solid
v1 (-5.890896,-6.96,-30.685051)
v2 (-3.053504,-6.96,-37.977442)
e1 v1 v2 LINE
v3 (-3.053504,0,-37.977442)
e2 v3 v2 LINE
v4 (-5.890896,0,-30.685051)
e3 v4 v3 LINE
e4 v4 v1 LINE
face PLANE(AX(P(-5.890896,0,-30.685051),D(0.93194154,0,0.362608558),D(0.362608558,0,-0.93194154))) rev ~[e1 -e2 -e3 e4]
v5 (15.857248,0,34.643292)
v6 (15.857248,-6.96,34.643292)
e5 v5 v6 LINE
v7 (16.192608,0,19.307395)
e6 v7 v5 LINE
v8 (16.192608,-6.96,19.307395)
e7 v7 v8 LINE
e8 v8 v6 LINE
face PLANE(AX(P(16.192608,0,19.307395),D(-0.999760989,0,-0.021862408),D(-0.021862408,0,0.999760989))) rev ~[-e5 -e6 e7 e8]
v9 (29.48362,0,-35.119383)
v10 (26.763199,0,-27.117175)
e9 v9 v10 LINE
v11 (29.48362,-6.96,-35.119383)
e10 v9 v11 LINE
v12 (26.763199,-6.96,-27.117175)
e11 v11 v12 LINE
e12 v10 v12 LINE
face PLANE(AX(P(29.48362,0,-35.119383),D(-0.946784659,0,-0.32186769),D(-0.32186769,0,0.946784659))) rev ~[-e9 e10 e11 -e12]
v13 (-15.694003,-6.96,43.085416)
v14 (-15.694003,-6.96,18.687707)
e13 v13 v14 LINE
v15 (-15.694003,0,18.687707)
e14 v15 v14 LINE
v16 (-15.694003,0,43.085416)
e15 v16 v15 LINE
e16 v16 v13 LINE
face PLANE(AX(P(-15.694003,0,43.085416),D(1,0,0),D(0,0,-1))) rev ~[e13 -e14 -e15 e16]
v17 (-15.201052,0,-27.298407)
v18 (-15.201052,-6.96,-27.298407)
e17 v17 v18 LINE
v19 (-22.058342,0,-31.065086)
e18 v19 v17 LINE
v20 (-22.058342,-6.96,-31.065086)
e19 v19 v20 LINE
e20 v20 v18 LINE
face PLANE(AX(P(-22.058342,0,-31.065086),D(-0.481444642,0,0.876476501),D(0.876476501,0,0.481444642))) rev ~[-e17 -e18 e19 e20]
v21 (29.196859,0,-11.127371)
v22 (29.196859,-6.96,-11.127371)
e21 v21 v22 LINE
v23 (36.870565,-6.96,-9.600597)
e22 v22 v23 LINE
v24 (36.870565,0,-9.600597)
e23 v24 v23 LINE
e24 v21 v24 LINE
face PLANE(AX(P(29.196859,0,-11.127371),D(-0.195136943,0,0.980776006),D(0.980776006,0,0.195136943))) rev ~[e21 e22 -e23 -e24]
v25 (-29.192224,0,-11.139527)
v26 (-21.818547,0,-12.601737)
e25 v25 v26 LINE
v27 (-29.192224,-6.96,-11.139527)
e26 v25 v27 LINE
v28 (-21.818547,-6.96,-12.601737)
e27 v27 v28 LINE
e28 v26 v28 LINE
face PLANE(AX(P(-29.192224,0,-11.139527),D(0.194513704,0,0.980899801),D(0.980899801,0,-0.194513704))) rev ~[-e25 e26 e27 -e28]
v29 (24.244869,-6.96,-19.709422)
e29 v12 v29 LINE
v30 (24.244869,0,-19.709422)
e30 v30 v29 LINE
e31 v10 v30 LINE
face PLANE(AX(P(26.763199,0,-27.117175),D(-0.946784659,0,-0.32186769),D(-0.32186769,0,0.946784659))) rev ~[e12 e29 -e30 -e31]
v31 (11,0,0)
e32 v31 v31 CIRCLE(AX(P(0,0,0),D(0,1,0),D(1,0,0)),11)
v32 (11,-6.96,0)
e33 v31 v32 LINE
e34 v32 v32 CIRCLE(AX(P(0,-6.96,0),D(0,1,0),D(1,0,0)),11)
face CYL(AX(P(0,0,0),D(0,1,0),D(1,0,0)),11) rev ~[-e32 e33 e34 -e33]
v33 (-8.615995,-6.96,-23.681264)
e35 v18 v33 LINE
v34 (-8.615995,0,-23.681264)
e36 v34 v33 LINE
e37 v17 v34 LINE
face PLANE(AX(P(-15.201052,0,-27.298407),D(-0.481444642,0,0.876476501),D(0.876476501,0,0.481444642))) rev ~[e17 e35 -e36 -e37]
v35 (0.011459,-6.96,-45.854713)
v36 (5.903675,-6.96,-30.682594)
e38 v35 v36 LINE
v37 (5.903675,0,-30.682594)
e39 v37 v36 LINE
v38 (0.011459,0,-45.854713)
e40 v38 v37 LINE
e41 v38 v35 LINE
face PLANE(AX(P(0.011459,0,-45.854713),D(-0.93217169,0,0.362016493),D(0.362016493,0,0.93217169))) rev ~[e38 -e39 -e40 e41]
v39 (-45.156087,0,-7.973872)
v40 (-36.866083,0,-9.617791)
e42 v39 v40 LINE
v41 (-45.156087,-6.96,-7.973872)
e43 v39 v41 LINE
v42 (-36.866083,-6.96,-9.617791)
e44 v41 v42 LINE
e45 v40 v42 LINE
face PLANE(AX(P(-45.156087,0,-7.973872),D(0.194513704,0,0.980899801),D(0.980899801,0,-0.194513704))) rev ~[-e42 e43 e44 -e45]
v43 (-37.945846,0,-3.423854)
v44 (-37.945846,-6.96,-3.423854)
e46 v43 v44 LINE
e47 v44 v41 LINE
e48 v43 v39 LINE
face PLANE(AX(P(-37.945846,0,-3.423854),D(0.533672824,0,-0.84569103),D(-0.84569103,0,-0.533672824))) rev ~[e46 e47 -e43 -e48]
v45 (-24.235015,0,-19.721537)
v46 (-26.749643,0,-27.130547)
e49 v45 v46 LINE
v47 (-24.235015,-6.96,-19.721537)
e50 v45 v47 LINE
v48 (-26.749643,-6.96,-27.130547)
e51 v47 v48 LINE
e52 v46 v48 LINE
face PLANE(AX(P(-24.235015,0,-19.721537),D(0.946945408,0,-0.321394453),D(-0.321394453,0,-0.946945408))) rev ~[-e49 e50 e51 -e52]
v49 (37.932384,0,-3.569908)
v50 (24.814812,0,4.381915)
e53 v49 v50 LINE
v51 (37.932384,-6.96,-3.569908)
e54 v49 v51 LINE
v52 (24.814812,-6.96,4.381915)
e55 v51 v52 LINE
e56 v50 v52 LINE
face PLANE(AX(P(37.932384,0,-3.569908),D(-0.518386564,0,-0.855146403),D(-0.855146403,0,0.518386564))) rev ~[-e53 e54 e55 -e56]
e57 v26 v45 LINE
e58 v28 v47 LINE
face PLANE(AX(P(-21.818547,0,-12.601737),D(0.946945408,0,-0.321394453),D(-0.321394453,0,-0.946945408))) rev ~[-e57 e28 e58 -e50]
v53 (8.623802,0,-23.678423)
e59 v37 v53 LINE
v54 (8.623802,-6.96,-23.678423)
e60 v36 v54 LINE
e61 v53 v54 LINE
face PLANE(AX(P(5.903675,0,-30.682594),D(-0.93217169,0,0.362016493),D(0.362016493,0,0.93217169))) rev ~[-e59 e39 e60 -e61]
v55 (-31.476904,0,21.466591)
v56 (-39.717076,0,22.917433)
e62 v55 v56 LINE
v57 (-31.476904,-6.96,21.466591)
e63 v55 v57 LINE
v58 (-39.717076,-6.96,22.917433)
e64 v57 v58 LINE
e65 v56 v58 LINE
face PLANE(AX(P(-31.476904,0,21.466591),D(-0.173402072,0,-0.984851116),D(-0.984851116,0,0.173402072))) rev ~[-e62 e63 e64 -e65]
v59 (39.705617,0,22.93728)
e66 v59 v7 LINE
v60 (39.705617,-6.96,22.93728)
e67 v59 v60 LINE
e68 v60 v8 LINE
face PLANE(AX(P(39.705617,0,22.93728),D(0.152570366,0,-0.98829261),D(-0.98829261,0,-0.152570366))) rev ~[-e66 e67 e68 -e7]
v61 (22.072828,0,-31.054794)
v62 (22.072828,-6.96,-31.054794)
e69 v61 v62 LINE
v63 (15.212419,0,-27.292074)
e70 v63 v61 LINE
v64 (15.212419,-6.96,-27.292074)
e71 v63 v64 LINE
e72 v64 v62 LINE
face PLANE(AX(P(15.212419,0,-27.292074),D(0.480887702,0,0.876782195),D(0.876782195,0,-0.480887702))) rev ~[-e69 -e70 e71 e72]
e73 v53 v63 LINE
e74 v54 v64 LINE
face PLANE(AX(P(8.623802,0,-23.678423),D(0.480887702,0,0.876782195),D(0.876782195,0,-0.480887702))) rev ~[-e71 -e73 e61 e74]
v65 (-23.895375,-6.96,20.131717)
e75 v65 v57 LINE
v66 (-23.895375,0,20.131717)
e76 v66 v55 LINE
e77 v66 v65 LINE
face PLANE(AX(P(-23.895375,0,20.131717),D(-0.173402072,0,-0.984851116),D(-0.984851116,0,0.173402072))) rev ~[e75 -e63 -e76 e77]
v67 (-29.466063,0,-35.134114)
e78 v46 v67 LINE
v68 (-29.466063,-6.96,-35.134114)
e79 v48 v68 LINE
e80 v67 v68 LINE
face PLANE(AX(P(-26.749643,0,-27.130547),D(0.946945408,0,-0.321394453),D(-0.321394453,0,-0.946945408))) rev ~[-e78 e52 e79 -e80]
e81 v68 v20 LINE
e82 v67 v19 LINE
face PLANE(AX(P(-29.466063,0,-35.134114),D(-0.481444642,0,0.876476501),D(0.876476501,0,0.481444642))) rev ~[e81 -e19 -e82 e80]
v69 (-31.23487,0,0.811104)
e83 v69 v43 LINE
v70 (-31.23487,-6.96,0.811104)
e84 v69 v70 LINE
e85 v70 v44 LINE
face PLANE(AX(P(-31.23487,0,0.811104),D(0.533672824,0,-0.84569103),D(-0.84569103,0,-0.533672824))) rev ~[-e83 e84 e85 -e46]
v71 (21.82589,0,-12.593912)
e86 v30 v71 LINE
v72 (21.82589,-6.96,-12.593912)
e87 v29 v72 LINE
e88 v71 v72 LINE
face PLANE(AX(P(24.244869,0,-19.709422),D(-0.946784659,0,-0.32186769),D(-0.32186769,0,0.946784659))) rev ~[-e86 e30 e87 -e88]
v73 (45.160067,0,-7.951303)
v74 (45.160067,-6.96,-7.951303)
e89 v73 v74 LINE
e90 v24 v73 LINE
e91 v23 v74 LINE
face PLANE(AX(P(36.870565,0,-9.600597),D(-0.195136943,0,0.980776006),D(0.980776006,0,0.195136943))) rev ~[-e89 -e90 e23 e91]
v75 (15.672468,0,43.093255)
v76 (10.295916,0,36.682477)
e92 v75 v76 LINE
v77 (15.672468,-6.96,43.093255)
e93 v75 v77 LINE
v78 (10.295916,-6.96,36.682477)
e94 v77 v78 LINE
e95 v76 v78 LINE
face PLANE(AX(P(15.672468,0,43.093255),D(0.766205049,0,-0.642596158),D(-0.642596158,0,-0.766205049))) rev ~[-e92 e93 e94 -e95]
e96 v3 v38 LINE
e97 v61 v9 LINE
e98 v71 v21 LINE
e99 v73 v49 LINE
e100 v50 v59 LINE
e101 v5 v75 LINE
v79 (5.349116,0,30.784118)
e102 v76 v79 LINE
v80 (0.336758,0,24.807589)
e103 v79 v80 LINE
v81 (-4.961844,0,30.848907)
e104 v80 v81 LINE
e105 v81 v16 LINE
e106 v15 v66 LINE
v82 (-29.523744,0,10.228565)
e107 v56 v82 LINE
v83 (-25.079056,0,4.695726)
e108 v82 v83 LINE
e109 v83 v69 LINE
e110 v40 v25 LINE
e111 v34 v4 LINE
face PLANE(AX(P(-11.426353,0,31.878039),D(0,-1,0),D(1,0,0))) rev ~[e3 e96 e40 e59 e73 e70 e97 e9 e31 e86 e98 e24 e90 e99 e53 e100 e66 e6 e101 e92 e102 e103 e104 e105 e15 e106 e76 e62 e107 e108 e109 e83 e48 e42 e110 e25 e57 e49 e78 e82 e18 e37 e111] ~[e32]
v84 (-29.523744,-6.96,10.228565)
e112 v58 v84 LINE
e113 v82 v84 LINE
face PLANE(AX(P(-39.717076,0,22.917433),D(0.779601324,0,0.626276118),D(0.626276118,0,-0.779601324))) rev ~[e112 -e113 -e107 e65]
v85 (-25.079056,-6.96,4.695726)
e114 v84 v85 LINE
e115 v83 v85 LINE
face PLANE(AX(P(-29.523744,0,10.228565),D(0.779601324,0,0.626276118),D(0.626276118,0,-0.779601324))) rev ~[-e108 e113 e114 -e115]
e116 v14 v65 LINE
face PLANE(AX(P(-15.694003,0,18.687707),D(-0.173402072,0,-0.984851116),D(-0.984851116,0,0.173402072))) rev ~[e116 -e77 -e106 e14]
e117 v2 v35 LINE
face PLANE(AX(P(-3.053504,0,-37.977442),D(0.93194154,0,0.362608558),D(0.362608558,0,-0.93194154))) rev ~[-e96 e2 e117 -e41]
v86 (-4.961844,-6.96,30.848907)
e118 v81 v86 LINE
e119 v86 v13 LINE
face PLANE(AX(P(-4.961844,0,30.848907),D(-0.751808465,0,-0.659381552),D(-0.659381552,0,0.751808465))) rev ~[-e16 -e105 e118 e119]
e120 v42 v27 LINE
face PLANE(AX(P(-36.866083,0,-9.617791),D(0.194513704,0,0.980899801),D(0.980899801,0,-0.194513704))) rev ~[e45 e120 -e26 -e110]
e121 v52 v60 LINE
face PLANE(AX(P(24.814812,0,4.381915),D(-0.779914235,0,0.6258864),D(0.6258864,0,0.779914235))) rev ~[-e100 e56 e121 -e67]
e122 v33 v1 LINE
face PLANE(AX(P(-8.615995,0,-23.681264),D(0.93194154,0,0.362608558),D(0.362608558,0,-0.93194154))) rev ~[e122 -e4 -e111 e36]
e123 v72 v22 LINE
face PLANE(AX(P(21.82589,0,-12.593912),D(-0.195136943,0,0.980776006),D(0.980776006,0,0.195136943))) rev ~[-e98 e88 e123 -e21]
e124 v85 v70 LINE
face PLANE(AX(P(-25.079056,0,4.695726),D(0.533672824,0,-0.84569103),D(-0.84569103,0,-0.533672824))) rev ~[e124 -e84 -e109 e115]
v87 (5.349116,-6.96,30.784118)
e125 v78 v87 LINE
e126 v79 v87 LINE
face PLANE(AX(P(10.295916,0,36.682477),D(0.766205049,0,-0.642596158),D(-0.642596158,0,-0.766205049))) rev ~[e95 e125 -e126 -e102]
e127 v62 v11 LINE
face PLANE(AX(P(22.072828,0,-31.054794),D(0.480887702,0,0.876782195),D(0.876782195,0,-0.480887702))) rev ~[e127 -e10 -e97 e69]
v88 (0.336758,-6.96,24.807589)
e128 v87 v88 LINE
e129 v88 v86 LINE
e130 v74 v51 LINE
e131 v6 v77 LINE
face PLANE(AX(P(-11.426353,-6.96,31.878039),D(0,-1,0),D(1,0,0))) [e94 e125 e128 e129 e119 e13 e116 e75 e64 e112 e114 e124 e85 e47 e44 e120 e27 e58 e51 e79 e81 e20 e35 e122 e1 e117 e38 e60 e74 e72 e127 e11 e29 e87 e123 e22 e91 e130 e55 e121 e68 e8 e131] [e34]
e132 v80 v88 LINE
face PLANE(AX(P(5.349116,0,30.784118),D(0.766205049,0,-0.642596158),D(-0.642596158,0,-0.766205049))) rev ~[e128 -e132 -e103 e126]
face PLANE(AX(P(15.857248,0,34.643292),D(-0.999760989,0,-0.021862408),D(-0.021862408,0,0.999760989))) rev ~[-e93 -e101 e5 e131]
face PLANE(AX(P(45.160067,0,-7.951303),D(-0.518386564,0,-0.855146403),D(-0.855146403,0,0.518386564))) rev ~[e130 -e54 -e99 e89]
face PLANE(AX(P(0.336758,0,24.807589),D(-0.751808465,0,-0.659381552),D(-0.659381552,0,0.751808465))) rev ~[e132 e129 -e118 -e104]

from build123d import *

# Parameters (mm, degrees)
F1_DEPTH = 6.96


# Not quite as in the source:
# - a feature of the source that left no trace in its solid (it failed there, or was rolled back) is left out
# - a feature names something its author has since deleted; it is built from what else it names


with BuildPart() as f1:
    # F0 (on Front) → F1 (new body)
    with BuildSketch(Plane.XZ):
        with BuildLine():
            Line((-4.9618439889, 30.8489073878), (-10.120921757, 36.7311440441))
            ThreePointArc((-10.120921757, 36.7311440441), (-12.9466687362, 35.832858784), (-15.6940034453, 34.7175496811))
            Line((-15.6940034453, 34.7175496811), (-15.6940034453, 27.0180169266))
            ThreePointArc((-15.6940034453, 27.0180169266), (-10.5040439231, 29.4268592285), (-4.9618439889, 30.8489073878))
        make_face()
        with BuildLine():
            ThreePointArc((-15.6940034453, 34.7175496811), (-12.9466687362, 35.832858784), (-10.120921757, 36.7311440441))
            Line((-10.120921757, 36.7311440441), (-15.6940034453, 43.0854164294))
            Line((-15.6940034453, 43.0854164294), (-15.6940034453, 34.7175496811))
        make_face()
        with BuildLine():
            Line((0.3367577987, 24.8075893339), (-4.9618439889, 30.8489073878))
            ThreePointArc((-4.9618439889, 30.8489073878), (-10.5040439231, 29.4268592285), (-15.6940034453, 27.0180169266))
            Line((-15.6940034453, 27.0180169266), (-15.6940034453, 18.6877066835))
            Line((-15.6940034453, 18.6877066835), (-6.1980460207, 17.0157598588))
            Line((-6.1980460207, 17.0157598588), (0.3367577987, 24.8075893339))
        make_face()
        with BuildLine():
            Line((5.349116457, 30.7841182417), (0.3367577987, 24.8075893339))
            Line((0.3367577987, 24.8075893339), (-6.1980460207, 17.0157598588))
            Line((-6.1980460207, 17.0157598588), (-15.6940034453, 18.6877066835))
            Line((-15.6940034453, 18.6877066835), (-15.6940034453, 10.6181583146))
            Line((-15.6940034453, 10.6181583146), (-25.0790561702, 4.6957263488))
            Line((-25.0790561702, 4.6957263488), (-18.6598426779, -3.2950419376))
            Line((-18.6598426779, -3.2950419376), (-21.8185465433, -12.6017368372))
            Line((-21.8185465433, -12.6017368372), (-12.1835113634, -14.5123768209))
            Line((-12.1835113634, -14.5123768209), (-8.6159947437, -23.6812639315))
            Line((-8.6159947437, -23.6812639315), (0, -18.9485363587))
            Line((0, -18.9485363587), (8.6238023794, -23.6784231328))
            Line((8.6238023794, -23.6784231328), (12.1835113634, -14.5123768209))
            Line((12.1835113634, -14.5123768209), (21.8258896669, -12.5939120432))
            Line((21.8258896669, -12.5939120432), (18.6614871852, -3.2857154732))
            Line((18.6614871852, -3.2857154732), (24.8148121143, 4.3819151105))
            Line((24.8148121143, 4.3819151105), (29.5186280009, 10.2433189804))
            Line((29.5186280009, 10.2433189804), (34.4156358122, 16.3454584408))
            Line((34.4156358122, 16.3454584408), (39.7056170429, 22.9372803158))
            Line((39.7056170429, 22.9372803158), (16.1926081875, 19.3073954844))
            Line((16.1926081875, 19.3073954844), (15.85724841, 34.6432918884))
            ThreePointArc((15.85724841, 34.6432918884), (14.4513233415, 35.2529325543), (13.0220201926, 35.8055441252))
            Line((13.0220201926, 35.8055441252), (10.6792184181, 29.3637408511))
            ThreePointArc((10.6792184181, 29.3637408511), (8.0455731741, 30.1917825756), (5.349116457, 30.7841182417))
        make_face()
        with BuildLine():
            ThreePointArc((3.7596383758, 10.3375586713), (9.0098840762, 6.3104666177), (11, 0))
            ThreePointArc((11, 0), (-9.0098840762, -6.3104666177), (3.7596383758, 10.3375586713))
        make_face(mode=Mode.SUBTRACT)
        with BuildLine():
            Line((-15.6940034453, 10.6181583146), (-15.6940034453, 18.6877066835))
            Line((-15.6940034453, 18.6877066835), (-23.8953753875, 20.1317167147))
            ThreePointArc((-23.8953753875, 20.1317167147), (-27.1646586752, 15.4387921111), (-29.52374385, 10.2285645068))
            Line((-29.52374385, 10.2285645068), (-25.0790561702, 4.6957263488))
            Line((-25.0790561702, 4.6957263488), (-15.6940034453, 10.6181583146))
        make_face()
        with BuildLine():
            Line((10.2959158336, 36.6824769767), (5.349116457, 30.7841182417))
            ThreePointArc((5.349116457, 30.7841182417), (8.0455731741, 30.1917825756), (10.6792184181, 29.3637408511))
            Line((10.6792184181, 29.3637408511), (13.0220201926, 35.8055441252))
            ThreePointArc((13.0220201926, 35.8055441252), (11.6672099465, 36.2696320916), (10.2959158336, 36.6824769767))
        make_face()
        with BuildLine():
            ThreePointArc((-29.52374385, 10.2285645068), (-27.1646586752, 15.4387921111), (-23.8953753875, 20.1317167147))
            Line((-23.8953753875, 20.1317167147), (-31.476903581, 21.4665912747))
            Line((-31.476903581, 21.4665912747), (-39.7170759686, 22.9174328742))
            Line((-39.7170759686, 22.9174328742), (-29.52374385, 10.2285645068))
        make_face()
        with BuildLine():
            Line((15.6724677094, 43.0932547963), (10.2959158336, 36.6824769767))
            ThreePointArc((10.2959158336, 36.6824769767), (11.6672099465, 36.2696320916), (13.0220201926, 35.8055441252))
            Line((13.0220201926, 35.8055441252), (15.6724677094, 43.0932547963))
        make_face()
        with BuildLine():
            Line((-18.6598426779, -3.2950419376), (-25.0790561702, 4.6957263488))
            Line((-25.0790561702, 4.6957263488), (-31.2348698324, 0.8111037816))
            ThreePointArc((-31.2348698324, 0.8111037816), (-30.7987467244, -5.2642362214), (-29.1922235992, -11.139527105))
            Line((-29.1922235992, -11.139527105), (-21.8185465433, -12.6017368372))
            Line((-21.8185465433, -12.6017368372), (-18.6598426779, -3.2950419376))
        make_face()
        with BuildLine():
            Line((15.85724841, 34.6432918884), (15.6724677094, 43.0932547963))
            Line((15.6724677094, 43.0932547963), (13.0220201926, 35.8055441252))
            ThreePointArc((13.0220201926, 35.8055441252), (14.4513233415, 35.2529325543), (15.85724841, 34.6432918884))
        make_face()
        with BuildLine():
            ThreePointArc((-29.1922235992, -11.139527105), (-30.7987467244, -5.2642362214), (-31.2348698324, 0.8111037816))
            Line((-31.2348698324, 0.8111037816), (-37.9458459601, -3.4238537307))
            ThreePointArc((-37.9458459601, -3.4238537307), (-37.5339500378, -6.54313339), (-36.8660833418, -9.6177907563))
            Line((-36.8660833418, -9.6177907563), (-29.1922235992, -11.139527105))
        make_face()
        with BuildLine():
            Line((-12.1835113634, -14.5123768209), (-21.8185465433, -12.6017368372))
            Line((-21.8185465433, -12.6017368372), (-24.2350154824, -19.7215366379))
            ThreePointArc((-24.2350154824, -19.7215366379), (-20.078672611, -23.9399642642), (-15.2010519849, -27.2984065715))
            Line((-15.2010519849, -27.2984065715), (-8.6159947437, -23.6812639315))
            Line((-8.6159947437, -23.6812639315), (-12.1835113634, -14.5123768209))
        make_face()
        with BuildLine():
            ThreePointArc((-36.8660833418, -9.6177907563), (-37.5339500378, -6.54313339), (-37.9458459601, -3.4238537307))
            Line((-37.9458459601, -3.4238537307), (-45.15608724, -7.9738722218))
            Line((-45.15608724, -7.9738722218), (-36.8660833418, -9.6177907563))
        make_face()
        with BuildLine():
            ThreePointArc((-15.2010519849, -27.2984065715), (-20.078672611, -23.9399642642), (-24.2350154824, -19.7215366379))
            Line((-24.2350154824, -19.7215366379), (-26.7496429738, -27.1305473733))
            ThreePointArc((-26.7496429738, -27.1305473733), (-24.4831574997, -29.1922078446), (-22.0583421712, -31.0650855569))
            Line((-22.0583421712, -31.0650855569), (-15.2010519849, -27.2984065715))
        make_face()
        with BuildLine():
            ThreePointArc((-22.0583421712, -31.0650855569), (-24.4831574997, -29.1922078446), (-26.7496429738, -27.1305473733))
            Line((-26.7496429738, -27.1305473733), (-29.4660634378, -35.1341138854))
            Line((-29.4660634378, -35.1341138854), (-22.0583421712, -31.0650855569))
        make_face()
        with BuildLine():
            Line((0, -18.9485363587), (-8.6159947437, -23.6812639315))
            Line((-8.6159947437, -23.6812639315), (-5.8908957162, -30.6850506021))
            ThreePointArc((-5.8908957162, -30.6850506021), (0.0065066962, -31.2453987085), (5.9036752179, -30.6825944423))
            Line((5.9036752179, -30.6825944423), (8.6238023794, -23.6784231328))
            Line((8.6238023794, -23.6784231328), (0, -18.9485363587))
        make_face()
        with BuildLine():
            ThreePointArc((5.9036752179, -30.6825944423), (0.0065066962, -31.2453987085), (-5.8908957162, -30.6850506021))
            Line((-5.8908957162, -30.6850506021), (-3.0535035766, -37.9774421981))
            Line((-3.0535035766, -37.9774421981), (0.0114589257, -45.8547131899))
            Line((0.0114589257, -45.8547131899), (5.9036752179, -30.6825944423))
        make_face()
        with BuildLine():
            Line((12.1835113634, -14.5123768209), (8.6238023794, -23.6784231328))
            Line((8.6238023794, -23.6784231328), (15.2124188317, -27.2920738691))
            ThreePointArc((15.2124188317, -27.2920738691), (20.0896378001, -23.930763378), (24.2448691352, -19.7094216914))
            Line((24.2448691352, -19.7094216914), (21.8258896669, -12.5939120432))
            Line((21.8258896669, -12.5939120432), (12.1835113634, -14.5123768209))
        make_face()
        with BuildLine():
            Line((31.2416193325, 0.4860085148), (24.8148121143, 4.3819151105))
            Line((24.8148121143, 4.3819151105), (18.6614871852, -3.2857154732))
            Line((18.6614871852, -3.2857154732), (21.8258896669, -12.5939120432))
            Line((21.8258896669, -12.5939120432), (29.1968594713, -11.1273707499))
            ThreePointArc((29.1968594713, -11.1273707499), (30.7720664648, -5.418017006), (31.2416193325, 0.4860085148))
        make_face()
        with BuildLine():
            ThreePointArc((24.2448691352, -19.7094216914), (20.0896378001, -23.930763378), (15.2124188317, -27.2920738691))
            Line((15.2124188317, -27.2920738691), (22.0728280834, -31.0547944833))
            ThreePointArc((22.0728280834, -31.0547944833), (24.4972570827, -29.1803768897), (26.7631992818, -27.117174709))
            Line((26.7631992818, -27.117174709), (24.2448691352, -19.7094216914))
        make_face()
        with BuildLine():
            Line((37.9323840026, -3.569908105), (31.2416193325, 0.4860085148))
            ThreePointArc((31.2416193325, 0.4860085148), (30.7720664648, -5.418017006), (29.1968594713, -11.1273707499))
            Line((29.1968594713, -11.1273707499), (36.8705647308, -9.6005966708))
            ThreePointArc((36.8705647308, -9.6005966708), (37.5228275313, -6.6066189578), (37.9323840026, -3.569908105))
        make_face()
        with BuildLine():
            ThreePointArc((26.7631992818, -27.117174709), (24.4972570827, -29.1803768897), (22.0728280834, -31.0547944833))
            Line((22.0728280834, -31.0547944833), (29.4836195306, -35.1193825745))
            Line((29.4836195306, -35.1193825745), (26.7631992818, -27.117174709))
        make_face()
        with BuildLine():
            Line((45.1600668832, -7.951302544), (37.9323840026, -3.569908105))
            ThreePointArc((37.9323840026, -3.569908105), (37.5228275313, -6.6066189578), (36.8705647308, -9.6005966708))
            Line((36.8705647308, -9.6005966708), (45.1600668832, -7.951302544))
        make_face()
    extrude(amount=F1_DEPTH)


solid = f1.part
